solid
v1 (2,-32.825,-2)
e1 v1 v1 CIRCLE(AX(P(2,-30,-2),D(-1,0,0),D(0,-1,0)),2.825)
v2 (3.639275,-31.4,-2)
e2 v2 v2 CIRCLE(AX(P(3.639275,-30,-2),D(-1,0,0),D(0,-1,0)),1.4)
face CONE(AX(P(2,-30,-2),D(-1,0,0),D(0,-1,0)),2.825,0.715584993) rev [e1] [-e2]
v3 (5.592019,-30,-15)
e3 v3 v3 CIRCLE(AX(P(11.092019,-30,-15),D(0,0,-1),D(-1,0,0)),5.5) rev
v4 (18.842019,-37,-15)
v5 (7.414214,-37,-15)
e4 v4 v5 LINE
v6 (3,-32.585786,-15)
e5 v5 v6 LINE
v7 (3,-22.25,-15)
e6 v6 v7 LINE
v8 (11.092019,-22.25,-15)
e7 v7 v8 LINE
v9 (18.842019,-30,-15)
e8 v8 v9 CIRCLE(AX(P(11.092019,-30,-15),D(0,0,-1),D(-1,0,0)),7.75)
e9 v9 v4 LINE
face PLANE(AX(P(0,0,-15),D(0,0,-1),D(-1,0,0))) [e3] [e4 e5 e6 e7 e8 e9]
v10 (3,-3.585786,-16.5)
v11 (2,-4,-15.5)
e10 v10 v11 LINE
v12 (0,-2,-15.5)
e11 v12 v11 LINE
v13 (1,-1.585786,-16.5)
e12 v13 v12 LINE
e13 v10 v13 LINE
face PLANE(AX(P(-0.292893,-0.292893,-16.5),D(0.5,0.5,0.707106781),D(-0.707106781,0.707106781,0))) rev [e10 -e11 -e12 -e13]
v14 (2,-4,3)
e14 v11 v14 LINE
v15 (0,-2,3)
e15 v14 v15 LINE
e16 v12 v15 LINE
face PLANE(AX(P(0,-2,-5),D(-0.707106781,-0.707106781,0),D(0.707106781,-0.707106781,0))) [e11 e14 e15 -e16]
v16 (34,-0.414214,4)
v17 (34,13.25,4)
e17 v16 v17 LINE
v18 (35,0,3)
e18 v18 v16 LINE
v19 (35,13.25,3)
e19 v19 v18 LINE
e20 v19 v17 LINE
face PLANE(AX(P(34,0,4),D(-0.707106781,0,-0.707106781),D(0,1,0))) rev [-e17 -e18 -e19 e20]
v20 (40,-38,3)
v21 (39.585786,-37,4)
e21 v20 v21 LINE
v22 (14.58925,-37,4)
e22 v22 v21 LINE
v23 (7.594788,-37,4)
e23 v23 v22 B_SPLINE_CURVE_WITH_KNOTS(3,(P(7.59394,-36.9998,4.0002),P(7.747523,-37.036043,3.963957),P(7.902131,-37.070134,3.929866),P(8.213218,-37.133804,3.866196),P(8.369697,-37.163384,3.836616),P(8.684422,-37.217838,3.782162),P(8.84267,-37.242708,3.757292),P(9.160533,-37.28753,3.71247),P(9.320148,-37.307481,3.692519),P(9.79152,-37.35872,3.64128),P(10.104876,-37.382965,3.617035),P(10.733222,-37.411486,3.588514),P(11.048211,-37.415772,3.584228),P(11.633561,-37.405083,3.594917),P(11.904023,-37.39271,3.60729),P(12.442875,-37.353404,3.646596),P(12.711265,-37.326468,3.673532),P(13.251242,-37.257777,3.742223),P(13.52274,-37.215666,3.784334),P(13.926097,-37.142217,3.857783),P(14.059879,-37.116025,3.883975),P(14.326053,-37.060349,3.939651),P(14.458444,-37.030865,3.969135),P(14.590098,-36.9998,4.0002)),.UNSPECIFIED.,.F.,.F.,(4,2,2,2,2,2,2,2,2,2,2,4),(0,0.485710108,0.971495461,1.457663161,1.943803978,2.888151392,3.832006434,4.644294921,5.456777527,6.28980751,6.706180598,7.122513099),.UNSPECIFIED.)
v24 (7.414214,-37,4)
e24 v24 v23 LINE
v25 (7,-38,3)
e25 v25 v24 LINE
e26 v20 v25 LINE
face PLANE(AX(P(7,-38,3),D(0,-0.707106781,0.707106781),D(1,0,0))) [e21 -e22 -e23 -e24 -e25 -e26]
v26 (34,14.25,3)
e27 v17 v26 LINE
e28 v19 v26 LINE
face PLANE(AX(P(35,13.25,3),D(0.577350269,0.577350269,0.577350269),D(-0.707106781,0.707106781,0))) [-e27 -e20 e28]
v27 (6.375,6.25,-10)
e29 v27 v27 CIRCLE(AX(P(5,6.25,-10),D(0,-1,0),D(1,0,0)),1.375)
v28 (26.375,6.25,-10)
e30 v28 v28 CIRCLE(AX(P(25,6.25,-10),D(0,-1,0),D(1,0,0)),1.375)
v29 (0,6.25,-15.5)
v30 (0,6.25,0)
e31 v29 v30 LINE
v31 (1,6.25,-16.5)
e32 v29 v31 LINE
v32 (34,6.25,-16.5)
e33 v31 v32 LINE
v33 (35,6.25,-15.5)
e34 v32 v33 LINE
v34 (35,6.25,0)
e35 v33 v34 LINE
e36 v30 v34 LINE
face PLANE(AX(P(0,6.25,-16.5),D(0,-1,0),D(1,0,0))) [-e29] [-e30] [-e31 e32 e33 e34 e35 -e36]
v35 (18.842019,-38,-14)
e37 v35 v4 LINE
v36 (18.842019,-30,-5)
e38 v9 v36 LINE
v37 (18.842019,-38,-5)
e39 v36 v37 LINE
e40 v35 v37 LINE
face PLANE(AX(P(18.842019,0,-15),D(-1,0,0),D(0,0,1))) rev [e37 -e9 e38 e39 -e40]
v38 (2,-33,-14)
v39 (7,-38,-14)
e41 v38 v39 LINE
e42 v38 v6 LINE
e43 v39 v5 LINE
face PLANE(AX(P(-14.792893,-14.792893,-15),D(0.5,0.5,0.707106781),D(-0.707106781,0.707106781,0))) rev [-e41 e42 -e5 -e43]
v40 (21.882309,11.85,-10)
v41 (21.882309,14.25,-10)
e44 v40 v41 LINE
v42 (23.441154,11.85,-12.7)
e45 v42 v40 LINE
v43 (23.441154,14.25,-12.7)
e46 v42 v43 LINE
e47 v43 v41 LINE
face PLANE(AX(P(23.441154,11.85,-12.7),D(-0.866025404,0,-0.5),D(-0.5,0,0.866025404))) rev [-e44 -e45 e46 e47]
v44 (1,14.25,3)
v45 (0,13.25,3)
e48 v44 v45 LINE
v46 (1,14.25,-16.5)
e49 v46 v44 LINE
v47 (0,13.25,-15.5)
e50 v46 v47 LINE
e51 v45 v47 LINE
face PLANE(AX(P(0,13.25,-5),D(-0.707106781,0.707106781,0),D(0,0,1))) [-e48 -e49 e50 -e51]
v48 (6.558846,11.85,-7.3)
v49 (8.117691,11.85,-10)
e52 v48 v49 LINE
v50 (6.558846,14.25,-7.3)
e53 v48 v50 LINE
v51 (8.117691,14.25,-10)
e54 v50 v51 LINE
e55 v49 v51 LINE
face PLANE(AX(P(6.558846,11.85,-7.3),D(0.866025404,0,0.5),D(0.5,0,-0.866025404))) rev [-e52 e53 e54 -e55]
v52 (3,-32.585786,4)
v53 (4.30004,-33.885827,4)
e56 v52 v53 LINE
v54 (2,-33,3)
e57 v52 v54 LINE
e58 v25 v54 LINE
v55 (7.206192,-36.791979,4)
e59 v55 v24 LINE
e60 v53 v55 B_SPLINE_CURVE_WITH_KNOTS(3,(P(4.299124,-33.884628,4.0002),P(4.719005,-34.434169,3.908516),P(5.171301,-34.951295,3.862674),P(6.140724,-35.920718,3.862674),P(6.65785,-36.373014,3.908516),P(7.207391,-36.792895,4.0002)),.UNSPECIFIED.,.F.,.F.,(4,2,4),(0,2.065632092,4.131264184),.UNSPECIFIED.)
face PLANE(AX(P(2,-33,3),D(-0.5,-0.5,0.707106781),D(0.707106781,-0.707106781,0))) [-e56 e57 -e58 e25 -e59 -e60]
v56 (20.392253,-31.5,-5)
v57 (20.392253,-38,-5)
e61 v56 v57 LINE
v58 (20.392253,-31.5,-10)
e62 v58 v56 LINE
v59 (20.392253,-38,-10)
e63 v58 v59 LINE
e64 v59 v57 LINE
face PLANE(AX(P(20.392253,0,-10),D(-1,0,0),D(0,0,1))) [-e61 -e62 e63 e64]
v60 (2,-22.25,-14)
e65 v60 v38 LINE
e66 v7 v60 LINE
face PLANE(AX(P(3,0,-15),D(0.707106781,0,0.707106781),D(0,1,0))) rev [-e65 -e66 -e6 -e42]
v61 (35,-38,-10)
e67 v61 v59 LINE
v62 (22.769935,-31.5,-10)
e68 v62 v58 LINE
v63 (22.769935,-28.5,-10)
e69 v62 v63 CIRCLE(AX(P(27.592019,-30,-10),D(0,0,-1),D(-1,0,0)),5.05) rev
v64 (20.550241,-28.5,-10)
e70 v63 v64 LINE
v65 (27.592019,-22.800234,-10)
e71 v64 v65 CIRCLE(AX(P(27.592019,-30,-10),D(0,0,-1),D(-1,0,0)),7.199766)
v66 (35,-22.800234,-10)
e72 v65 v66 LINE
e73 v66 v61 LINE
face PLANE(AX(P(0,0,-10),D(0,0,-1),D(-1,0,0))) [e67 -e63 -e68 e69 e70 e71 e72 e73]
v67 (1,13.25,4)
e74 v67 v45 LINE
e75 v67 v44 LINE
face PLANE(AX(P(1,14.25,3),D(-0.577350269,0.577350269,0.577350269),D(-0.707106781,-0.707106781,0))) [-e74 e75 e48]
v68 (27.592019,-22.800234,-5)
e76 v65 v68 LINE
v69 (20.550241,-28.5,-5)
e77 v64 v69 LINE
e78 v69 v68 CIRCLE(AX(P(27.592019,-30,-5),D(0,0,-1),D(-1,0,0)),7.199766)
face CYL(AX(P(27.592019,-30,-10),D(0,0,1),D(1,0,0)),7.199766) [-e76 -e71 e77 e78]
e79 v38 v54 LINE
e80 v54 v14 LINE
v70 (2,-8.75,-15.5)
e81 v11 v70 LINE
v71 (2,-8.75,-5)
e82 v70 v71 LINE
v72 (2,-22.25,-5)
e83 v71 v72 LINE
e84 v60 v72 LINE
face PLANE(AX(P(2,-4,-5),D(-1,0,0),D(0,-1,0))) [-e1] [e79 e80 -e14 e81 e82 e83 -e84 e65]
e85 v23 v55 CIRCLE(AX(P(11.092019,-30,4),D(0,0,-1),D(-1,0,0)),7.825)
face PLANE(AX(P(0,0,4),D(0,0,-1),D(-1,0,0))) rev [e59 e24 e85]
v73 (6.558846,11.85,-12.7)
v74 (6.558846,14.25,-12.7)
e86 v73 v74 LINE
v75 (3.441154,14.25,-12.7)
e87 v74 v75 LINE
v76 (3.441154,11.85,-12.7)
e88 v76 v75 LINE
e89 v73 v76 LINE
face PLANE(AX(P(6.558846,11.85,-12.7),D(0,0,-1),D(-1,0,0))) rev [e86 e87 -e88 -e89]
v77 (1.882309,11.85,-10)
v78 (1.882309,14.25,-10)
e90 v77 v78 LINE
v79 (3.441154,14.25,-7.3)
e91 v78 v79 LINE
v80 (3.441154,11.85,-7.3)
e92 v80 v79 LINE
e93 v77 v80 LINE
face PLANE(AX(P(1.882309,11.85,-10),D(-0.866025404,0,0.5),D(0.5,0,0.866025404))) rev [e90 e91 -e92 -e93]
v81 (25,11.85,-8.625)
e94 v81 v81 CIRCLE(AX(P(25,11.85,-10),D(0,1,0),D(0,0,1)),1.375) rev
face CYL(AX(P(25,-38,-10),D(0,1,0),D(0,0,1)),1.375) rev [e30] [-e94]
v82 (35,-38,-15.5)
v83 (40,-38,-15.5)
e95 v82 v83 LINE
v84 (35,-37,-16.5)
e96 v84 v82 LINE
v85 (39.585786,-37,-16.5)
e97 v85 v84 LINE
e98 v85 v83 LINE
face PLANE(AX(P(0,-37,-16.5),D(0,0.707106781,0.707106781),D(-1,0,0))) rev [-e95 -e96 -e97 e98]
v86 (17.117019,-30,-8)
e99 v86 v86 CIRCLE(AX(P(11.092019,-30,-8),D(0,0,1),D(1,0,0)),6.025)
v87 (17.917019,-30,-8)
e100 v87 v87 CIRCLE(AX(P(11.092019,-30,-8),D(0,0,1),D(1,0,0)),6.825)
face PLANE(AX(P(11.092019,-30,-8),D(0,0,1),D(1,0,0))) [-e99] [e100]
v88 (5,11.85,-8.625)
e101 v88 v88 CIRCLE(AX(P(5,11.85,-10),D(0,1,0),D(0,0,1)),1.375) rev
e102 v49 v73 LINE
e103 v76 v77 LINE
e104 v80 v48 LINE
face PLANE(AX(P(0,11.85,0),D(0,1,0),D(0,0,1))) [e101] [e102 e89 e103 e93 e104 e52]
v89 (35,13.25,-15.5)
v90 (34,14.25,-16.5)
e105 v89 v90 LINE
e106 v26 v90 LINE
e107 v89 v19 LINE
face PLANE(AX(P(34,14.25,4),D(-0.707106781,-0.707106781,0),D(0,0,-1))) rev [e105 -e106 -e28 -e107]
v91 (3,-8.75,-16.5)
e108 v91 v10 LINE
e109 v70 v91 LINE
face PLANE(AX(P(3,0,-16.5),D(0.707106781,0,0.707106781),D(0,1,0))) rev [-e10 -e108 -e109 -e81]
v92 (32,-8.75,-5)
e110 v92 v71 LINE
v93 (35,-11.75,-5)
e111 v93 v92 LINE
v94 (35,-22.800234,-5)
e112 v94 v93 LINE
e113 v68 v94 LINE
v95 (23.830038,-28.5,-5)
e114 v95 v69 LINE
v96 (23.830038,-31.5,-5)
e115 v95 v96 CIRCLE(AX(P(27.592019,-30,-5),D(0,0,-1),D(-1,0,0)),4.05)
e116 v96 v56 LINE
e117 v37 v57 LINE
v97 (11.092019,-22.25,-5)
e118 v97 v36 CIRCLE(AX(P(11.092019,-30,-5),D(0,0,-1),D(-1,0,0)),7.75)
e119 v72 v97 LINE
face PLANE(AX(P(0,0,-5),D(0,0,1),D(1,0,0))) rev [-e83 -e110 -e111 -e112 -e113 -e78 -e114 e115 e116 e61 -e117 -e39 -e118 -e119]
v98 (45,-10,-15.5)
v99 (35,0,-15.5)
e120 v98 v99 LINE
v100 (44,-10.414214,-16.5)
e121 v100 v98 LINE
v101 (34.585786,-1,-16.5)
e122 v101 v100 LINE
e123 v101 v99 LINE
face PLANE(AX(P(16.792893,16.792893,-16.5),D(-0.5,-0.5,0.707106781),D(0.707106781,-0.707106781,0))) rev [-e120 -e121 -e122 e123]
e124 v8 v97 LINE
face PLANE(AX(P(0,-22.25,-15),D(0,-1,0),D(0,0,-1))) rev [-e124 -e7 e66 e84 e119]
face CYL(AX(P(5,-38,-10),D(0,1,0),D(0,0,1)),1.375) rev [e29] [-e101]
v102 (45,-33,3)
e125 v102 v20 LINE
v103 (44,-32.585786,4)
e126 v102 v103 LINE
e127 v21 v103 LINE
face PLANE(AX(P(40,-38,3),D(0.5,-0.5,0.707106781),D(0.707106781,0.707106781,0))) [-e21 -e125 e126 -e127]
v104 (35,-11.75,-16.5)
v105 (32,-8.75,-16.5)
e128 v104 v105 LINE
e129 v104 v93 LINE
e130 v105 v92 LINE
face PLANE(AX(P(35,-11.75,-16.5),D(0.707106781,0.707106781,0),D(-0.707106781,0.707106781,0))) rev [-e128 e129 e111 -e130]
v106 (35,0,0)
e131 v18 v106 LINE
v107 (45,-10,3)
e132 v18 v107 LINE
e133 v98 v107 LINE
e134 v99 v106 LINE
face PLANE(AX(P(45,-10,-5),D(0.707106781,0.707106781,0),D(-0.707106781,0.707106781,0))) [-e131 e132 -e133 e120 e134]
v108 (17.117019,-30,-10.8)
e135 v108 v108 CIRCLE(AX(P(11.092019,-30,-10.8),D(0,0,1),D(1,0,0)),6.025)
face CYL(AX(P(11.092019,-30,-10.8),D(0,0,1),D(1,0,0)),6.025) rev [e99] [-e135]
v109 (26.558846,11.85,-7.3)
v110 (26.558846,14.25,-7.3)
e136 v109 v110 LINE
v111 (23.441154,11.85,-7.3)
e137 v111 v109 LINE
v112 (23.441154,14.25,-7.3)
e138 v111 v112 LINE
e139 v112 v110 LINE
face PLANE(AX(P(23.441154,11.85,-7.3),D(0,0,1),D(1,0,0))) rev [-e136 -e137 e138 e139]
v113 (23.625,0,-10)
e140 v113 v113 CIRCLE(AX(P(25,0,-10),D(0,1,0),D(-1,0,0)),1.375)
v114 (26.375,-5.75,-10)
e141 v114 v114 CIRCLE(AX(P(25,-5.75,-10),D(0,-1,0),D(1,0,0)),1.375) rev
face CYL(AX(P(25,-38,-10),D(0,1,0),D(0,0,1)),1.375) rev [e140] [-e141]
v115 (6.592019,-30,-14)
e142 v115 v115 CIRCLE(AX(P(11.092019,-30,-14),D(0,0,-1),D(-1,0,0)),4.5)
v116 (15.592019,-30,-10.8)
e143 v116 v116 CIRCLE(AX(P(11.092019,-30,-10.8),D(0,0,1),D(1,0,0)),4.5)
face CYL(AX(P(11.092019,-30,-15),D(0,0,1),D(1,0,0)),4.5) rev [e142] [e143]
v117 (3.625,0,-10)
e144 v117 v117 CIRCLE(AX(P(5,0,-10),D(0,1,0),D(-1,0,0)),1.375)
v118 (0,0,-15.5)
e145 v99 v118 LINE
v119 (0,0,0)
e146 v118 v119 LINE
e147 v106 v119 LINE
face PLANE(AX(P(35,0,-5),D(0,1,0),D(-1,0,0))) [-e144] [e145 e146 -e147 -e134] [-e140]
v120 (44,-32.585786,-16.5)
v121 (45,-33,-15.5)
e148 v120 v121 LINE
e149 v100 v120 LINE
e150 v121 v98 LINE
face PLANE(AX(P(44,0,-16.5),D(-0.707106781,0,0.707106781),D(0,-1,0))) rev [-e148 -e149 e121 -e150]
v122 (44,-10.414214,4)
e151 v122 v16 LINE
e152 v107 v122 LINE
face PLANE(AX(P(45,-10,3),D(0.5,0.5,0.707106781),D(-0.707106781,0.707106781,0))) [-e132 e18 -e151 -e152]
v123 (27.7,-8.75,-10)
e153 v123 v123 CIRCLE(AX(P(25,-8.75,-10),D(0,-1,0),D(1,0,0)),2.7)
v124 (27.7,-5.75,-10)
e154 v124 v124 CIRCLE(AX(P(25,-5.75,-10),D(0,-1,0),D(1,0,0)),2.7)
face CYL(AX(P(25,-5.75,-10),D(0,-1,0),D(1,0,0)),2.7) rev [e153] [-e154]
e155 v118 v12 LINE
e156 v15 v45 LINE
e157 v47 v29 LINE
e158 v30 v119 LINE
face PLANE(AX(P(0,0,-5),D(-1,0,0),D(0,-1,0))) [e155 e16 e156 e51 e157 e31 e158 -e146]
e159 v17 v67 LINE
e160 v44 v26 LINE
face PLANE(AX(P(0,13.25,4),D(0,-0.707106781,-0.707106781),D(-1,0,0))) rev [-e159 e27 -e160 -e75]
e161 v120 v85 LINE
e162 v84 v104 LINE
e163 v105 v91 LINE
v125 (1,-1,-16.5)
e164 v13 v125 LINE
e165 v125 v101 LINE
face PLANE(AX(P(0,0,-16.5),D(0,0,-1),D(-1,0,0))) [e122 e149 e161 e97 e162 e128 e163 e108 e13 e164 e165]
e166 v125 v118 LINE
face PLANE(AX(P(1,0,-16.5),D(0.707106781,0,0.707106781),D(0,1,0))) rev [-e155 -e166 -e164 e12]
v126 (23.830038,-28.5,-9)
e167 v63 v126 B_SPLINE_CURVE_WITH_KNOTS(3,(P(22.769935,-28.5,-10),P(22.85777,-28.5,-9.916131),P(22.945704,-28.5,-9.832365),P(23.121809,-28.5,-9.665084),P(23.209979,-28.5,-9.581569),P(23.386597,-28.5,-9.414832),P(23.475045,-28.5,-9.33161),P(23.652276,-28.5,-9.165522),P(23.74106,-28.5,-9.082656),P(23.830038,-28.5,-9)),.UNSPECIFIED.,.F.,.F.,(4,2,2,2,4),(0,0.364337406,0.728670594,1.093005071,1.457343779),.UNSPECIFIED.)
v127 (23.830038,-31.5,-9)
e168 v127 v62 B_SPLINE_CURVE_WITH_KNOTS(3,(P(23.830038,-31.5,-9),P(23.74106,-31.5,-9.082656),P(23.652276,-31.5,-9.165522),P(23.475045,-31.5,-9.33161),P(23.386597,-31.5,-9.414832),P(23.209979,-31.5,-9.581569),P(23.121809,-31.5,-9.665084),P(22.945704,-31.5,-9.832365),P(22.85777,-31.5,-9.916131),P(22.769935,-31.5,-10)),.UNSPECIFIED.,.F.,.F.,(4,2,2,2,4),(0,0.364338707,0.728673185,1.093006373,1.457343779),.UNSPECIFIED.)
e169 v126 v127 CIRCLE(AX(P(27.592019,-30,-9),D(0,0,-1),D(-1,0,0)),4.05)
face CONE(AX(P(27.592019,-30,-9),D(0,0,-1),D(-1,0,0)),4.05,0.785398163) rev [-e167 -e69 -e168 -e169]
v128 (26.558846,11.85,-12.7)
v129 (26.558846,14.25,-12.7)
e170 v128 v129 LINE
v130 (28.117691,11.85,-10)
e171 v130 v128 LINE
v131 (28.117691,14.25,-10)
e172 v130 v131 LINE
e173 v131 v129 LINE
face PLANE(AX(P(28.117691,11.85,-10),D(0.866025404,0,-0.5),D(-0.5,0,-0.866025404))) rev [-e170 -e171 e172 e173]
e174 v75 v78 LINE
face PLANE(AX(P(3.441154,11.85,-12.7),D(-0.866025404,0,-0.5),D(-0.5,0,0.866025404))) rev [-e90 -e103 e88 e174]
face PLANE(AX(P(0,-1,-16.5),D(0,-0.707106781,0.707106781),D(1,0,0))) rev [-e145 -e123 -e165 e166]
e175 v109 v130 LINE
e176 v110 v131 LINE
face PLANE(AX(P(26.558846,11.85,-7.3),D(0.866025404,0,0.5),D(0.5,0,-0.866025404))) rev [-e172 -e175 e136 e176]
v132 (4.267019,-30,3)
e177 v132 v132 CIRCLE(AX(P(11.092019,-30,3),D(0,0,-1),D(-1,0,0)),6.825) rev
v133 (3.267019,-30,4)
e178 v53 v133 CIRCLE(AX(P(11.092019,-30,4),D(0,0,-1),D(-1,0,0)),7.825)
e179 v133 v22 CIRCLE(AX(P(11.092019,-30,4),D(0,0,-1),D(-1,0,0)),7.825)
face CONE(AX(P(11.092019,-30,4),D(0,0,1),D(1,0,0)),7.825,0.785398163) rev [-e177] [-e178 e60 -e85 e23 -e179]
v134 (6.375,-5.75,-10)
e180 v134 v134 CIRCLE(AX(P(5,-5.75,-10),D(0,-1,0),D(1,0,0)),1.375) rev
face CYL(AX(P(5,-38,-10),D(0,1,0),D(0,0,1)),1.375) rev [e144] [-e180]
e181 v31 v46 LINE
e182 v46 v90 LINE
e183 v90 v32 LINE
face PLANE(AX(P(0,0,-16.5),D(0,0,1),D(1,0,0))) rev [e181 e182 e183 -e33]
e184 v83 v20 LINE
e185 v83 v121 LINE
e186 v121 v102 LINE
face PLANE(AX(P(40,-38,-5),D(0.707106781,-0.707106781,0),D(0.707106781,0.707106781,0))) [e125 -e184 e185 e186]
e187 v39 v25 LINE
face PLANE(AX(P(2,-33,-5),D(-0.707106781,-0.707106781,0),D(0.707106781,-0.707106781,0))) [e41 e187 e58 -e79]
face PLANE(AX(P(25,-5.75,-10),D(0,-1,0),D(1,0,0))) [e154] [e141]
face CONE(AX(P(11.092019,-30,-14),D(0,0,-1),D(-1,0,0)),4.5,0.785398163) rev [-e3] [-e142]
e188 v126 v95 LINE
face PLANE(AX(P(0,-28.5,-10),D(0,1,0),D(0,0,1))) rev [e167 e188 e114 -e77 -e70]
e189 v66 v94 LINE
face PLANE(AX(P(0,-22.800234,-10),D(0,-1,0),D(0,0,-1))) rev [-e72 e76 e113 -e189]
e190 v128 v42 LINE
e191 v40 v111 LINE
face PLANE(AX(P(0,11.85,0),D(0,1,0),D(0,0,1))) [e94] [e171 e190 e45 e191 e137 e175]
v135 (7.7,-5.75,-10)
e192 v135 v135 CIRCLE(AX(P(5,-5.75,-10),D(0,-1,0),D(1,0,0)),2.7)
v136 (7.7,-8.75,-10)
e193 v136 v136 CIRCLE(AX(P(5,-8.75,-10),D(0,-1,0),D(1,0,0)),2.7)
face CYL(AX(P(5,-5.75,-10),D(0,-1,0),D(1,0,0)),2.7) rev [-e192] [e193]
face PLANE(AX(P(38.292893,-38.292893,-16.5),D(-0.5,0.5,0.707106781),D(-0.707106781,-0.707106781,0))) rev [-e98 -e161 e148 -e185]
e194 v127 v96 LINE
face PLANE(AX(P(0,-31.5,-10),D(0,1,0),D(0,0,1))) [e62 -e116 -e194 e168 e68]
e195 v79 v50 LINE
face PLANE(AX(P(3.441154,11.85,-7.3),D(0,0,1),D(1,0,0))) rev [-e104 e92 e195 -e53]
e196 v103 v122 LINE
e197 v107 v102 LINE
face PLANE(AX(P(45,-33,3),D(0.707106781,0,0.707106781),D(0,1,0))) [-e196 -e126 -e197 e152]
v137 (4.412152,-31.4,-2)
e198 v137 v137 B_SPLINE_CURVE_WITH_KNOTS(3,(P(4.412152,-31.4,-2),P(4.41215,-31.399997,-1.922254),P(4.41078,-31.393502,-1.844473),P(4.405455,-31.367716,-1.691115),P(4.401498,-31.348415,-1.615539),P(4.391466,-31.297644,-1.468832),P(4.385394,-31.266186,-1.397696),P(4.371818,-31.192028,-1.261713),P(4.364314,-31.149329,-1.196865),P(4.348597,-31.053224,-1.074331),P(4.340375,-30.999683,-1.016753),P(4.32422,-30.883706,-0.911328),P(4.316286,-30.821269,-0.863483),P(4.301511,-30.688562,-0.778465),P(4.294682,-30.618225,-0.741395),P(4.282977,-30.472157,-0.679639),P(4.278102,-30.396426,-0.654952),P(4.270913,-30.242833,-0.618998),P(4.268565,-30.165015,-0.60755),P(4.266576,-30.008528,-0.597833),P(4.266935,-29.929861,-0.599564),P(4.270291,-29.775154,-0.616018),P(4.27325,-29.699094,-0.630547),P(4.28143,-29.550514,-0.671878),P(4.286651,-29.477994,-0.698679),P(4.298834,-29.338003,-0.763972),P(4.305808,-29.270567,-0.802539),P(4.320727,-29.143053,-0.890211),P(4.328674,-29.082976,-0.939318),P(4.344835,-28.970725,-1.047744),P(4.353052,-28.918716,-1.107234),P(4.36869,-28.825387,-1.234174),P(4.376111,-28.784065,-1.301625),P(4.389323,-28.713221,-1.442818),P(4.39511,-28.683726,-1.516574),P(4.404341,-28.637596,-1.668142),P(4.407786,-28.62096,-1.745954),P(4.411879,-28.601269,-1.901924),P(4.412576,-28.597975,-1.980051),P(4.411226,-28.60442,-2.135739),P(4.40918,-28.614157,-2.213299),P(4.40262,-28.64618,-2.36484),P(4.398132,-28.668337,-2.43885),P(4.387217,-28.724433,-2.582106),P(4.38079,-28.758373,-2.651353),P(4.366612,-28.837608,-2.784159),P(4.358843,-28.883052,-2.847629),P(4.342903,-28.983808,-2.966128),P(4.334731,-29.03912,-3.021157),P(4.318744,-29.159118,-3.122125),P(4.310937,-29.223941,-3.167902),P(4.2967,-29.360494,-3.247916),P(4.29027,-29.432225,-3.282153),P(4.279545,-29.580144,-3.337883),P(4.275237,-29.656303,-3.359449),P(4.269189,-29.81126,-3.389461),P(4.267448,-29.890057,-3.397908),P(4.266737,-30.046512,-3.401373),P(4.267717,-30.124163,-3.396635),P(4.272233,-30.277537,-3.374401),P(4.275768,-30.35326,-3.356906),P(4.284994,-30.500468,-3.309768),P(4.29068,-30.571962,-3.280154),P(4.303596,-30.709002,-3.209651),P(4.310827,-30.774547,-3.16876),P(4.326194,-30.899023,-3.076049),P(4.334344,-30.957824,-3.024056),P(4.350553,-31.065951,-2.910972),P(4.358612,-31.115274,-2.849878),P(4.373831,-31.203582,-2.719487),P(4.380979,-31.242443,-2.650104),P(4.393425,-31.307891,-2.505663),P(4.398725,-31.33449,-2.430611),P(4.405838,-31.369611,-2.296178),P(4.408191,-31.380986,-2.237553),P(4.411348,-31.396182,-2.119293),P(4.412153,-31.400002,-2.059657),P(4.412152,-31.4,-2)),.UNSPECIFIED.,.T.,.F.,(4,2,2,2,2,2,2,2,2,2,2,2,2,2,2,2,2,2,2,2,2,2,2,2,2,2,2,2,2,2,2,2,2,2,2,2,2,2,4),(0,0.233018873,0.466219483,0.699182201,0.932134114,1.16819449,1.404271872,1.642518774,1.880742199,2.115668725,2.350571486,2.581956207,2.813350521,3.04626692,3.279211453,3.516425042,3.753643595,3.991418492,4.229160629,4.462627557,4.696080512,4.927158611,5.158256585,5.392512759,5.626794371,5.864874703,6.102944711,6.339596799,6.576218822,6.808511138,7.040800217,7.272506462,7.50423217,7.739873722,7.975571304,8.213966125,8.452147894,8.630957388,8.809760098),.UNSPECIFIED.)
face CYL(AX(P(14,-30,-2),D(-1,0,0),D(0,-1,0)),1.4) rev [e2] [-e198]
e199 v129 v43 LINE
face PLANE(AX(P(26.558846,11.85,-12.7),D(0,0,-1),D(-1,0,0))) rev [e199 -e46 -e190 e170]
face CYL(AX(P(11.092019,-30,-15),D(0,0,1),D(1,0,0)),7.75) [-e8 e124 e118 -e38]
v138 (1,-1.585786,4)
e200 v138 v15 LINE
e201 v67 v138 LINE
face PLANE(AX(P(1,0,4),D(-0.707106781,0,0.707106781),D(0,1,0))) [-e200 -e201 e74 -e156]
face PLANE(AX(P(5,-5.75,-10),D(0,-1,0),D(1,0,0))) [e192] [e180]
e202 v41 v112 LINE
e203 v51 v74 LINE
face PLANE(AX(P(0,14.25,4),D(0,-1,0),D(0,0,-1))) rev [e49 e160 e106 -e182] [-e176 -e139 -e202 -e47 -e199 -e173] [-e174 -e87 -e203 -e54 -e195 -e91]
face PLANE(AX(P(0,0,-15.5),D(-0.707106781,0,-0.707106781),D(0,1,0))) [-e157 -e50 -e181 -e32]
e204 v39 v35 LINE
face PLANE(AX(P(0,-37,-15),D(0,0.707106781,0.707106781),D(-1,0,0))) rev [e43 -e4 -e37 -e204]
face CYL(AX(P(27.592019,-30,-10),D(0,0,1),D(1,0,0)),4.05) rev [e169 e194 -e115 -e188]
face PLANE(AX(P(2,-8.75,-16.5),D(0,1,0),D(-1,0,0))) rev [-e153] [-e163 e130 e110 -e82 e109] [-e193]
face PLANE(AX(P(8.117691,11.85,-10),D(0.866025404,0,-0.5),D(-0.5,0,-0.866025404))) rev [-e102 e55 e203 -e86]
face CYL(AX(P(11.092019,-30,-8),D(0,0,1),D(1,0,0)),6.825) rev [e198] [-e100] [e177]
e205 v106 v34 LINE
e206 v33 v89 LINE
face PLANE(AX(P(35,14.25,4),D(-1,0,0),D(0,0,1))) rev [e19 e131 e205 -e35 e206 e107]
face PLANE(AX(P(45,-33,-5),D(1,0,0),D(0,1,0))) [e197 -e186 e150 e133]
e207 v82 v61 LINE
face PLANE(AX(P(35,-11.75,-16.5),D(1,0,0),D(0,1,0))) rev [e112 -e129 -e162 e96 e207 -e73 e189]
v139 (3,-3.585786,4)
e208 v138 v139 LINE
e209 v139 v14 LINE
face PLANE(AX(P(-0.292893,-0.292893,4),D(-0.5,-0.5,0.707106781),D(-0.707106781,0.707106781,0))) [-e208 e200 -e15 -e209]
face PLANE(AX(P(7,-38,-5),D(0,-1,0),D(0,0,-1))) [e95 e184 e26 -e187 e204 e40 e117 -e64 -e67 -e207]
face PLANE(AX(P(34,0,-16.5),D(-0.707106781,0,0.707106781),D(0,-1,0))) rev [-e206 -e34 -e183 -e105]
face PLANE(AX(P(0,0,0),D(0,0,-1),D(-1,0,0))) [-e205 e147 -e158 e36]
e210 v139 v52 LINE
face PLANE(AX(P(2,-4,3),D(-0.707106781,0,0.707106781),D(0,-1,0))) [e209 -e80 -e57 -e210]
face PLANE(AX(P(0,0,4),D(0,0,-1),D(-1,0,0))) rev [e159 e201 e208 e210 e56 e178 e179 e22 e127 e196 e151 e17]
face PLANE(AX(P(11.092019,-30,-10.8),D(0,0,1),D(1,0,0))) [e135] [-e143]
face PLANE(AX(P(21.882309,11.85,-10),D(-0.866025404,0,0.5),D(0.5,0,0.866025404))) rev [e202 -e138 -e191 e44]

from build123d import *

# Parameters (mm, degrees)
EXTRUDE_1_DEPTH          = 5
EXTRUDE_2_DEPTH          = 4
SKETCH_3_W               = 35
SKETCH_3_H               = 8
EXTRUDE_3_DEPTH          = 16.5
EXTRUDE_4_DEPTH          = 11.5
CUT_EXTRUDE_1_DEPTH      = 62.165758395
CUT_EXTRUDE_1_DEPTH_BACK = 62.165758395
SKETCH_6_R               = 1.375
CUT_EXTRUDE_2_DEPTH      = 2.4
SKETCH_9_R               = 2.7
CUT_EXTRUDE_4_DEPTH      = 3
EXTRUDE_5_DEPTH          = 5
SKETCH_10_3_R            = 4.5
EXTRUDE_6_DEPTH          = 10
SKETCH_13_R              = 6.825
CUT_EXTRUDE_5_DEPTH      = 8
SKETCH_14_R              = 6.025
CUT_EXTRUDE_6_DEPTH      = 2.8
SKETCH_15_R              = 1.4
CUT_EXTRUDE_7_DEPTH      = 12
CHAMFER_2_SIZE           = 1
EXTRUDE_START            = 4
SKETCH_18_R              = 6.825
EXTRUDE_9_DEPTH          = 4
SKETCH_19_R              = 2.825
CUT_EXTRUDE_9_DEPTH      = 1.8
CUT_EXTRUDE_9_DRAFT      = -41


with BuildPart() as part:
    # 스케치1 → 보스-돌출1 (new body)
    with BuildSketch(Plane.XY):
        Polygon((0, 0), (0, -2), (2, -4), (2, -33), (7, -38), (40, -38), (45, -33), (45, -10), (35, 0), align=None)
    extrude(amount=-EXTRUDE_1_DEPTH)

    # 스케치2 → 보스-돌출2 (add)
    with BuildSketch(Plane.XY):
        Polygon((0, -2), (0, 14.25), (35, 14.25), (35, -4), (2, -4), align=None)
    extrude(amount=EXTRUDE_2_DEPTH)

    # 스케치3 → 보스-돌출3 (add)
    with BuildSketch(Plane(origin=(0, 0, 0), x_dir=(-1, 0, 0), z_dir=(0, 0, -1))):
        with Locations((-17.5, 10.25)):
            Rectangle(SKETCH_3_W, SKETCH_3_H)
    extrude(amount=EXTRUDE_3_DEPTH)

    # 스케치5 → 보스-돌출4 (add)
    with BuildSketch(Plane(origin=(0, 0, -5), x_dir=(-1, 0, 0), z_dir=(0, 0, -1))):
        Polygon((-35, -11.75), (-35, -38), (-40, -38), (-45, -33), (-45, -10), (-35, 0), (0, 0), (0, -2), (-2, -4), (-2, -8.75), (-32, -8.75), align=None)
    extrude(amount=EXTRUDE_4_DEPTH)

    # 스케치6 → 컷-돌출1 (cut, two sides: drawn at the far end of the back side and taken through both)
    with BuildSketch(Plane(origin=(0, 0, 0), x_dir=(1, 0, 0), z_dir=(0, 1, 0)).offset(-CUT_EXTRUDE_1_DEPTH_BACK)):
        with Locations(Location((25, 10, 0), (0, 0, 180))):
            Circle(SKETCH_6_R)
        with Locations(Location((5, 10, 0), (0, 0, 180))):
            Circle(SKETCH_6_R)
    extrude(amount=CUT_EXTRUDE_1_DEPTH + CUT_EXTRUDE_1_DEPTH_BACK, mode=Mode.SUBTRACT)

    # 스케치7 → 컷-돌출2 (cut)
    with BuildSketch(Plane(origin=(0, 14.25, 0), x_dir=(1, 0, 0), z_dir=(0, 1, 0))):
        Polygon((8.117691454, 10), (6.558845727, 12.7), (3.441154273, 12.7), (1.882308546, 10), (3.441154273, 7.3), (6.558845727, 7.3), align=None)
        Polygon((28.117691454, 10), (26.558845727, 12.7), (23.441154273, 12.7), (21.882308546, 10), (23.441154273, 7.3), (26.558845727, 7.3), align=None)
    extrude(amount=-CUT_EXTRUDE_2_DEPTH, mode=Mode.SUBTRACT)

    # 스케치9 → 컷-돌출4 (cut)
    with BuildSketch(Plane.XZ.offset(8.75)):
        with Locations((5, -10)):
            Circle(SKETCH_9_R)
        with Locations((25, -10)):
            Circle(SKETCH_9_R)
    extrude(amount=-CUT_EXTRUDE_4_DEPTH, mode=Mode.SUBTRACT)

    # 스케치10 → 보스-돌출5 (add)
    with BuildSketch(Plane(origin=(0, 0, -5), x_dir=(-1, 0, 0), z_dir=(0, 0, -1))):
        with BuildLine():
            ThreePointArc((-20.550241291, -28.5), (-23.062284829, -24.403738546), (-27.592019124, -22.800233681))
            Line((-27.592019124, -22.800233681), (-35, -22.800233681))
            Line((-35, -22.800233681), (-35, -38))
            Line((-35, -38), (-20.392252805, -38))
            Line((-20.392252805, -38), (-20.392252805, -31.5))
            Line((-20.392252805, -31.5), (-23.830038263, -31.5))
            ThreePointArc((-23.830038263, -31.5), (-31.642019124, -30), (-23.830038263, -28.5))
            Line((-23.830038263, -28.5), (-20.550241291, -28.5))
        make_face()
    extrude(amount=EXTRUDE_5_DEPTH)

    # 스케치10<3> → 보스-돌출6 (add)
    with BuildSketch(Plane(origin=(0, 0, -5), x_dir=(-1, 0, 0), z_dir=(0, 0, -1))):
        with BuildLine():
            ThreePointArc((-11.092019124, -22.25), (-16.572096678, -24.519922446), (-18.842019124, -30))
            Line((-18.842019124, -30), (-18.842019124, -38))
            Line((-18.842019124, -38), (-7, -38))
            Line((-7, -38), (-2, -33))
            Line((-2, -33), (-2, -22.25))
            Line((-2, -22.25), (-11.092019124, -22.25))
        make_face()
        with Locations((-11.092019124, -30)):
            Circle(SKETCH_10_3_R, mode=Mode.SUBTRACT)
    extrude(amount=EXTRUDE_6_DEPTH)

    # 스케치13 → 컷-돌출5 (cut)
    with BuildSketch(Plane.XY):
        with Locations((11.092019124, -30)):
            Circle(SKETCH_13_R)
    extrude(amount=-CUT_EXTRUDE_5_DEPTH, mode=Mode.SUBTRACT)

    # 스케치14 → 컷-돌출6 (cut)
    with BuildSketch(Plane.XY.offset(-8)):
        with Locations((11.092019124, -30)):
            Circle(SKETCH_14_R)
    extrude(amount=-CUT_EXTRUDE_6_DEPTH, mode=Mode.SUBTRACT)

    # 스케치15 → 컷-돌출7 (cut)
    with BuildSketch(Plane.ZY.offset(-2)):
        with Locations(Location((-2, -30, 0), (0, 0, 270))):
            Circle(SKETCH_15_R)
    extrude(amount=-CUT_EXTRUDE_7_DEPTH, mode=Mode.SUBTRACT)

    # 모따기2
    chamfer_2_edges = [part.edges().sort_by_distance(p)[0] for p in [
        (31.642019124, -30, -10),
        (15.592019124, -30, -15),
    ]]
    chamfer(chamfer_2_edges, length=CHAMFER_2_SIZE)

    # 스케치18 → 보스-돌출9 (add)
    with BuildSketch(Plane.XY.offset(EXTRUDE_START)):
        Polygon((35, 0), (35, -4), (2, -4), (2, -33), (7, -38), (40, -38), (45, -33), (45, -10), align=None)
        with Locations((11.092019124, -30)):
            Circle(SKETCH_18_R, mode=Mode.SUBTRACT)
    extrude(amount=-EXTRUDE_9_DEPTH)


with BuildPart() as cut_extrude_9_tool:
    # 스케치19 → 컷-돌출9 (with draft: the straight prism first)
    with BuildSketch(Plane.ZY.offset(-2)):
        with Locations((-2, -30)):
            Circle(SKETCH_19_R)
    extrude(amount=-CUT_EXTRUDE_9_DEPTH)
    # 컷-돌출9: the draft: its side faces are tilted about the plane it starts from
    cut_extrude_9_sides = [cut_extrude_9_tool.faces().sort_by_distance(p)[0] for p in [
        (2.9, -30, -4.825),
    ]]
    draft(cut_extrude_9_sides, Plane.ZY.offset(-2), CUT_EXTRUDE_9_DRAFT)


with BuildPart() as part_1:
    add(part.part)

    # 컷-돌출9: cut by cut_extrude_9_tool
    add(cut_extrude_9_tool.part, mode=Mode.SUBTRACT)

    # 모따기4
    # the kernel refuses this chamfer: 1 mm, written as the material it takes off along each edge
    with BuildSketch(Plane(origin=(34.333333333, 13.583333333, 3.333333333), x_dir=(-0.7071067811865475, 0.7071067811865475, 0), z_dir=(0.5773502691896258, 0.5773502691896258, 0.5773502691896258))) as chamfer_4_piece_1:
        Polygon((-0.707106781, -0.40824829), (0.707106781, -0.40824829), (0, 0.816496581), align=None)
    extrude(amount=1.270170592, mode=Mode.SUBTRACT)
    with BuildSketch(Plane(origin=(0.666666667, 13.583333333, 3.333333333), x_dir=(0.707106781186548, 0.7071067811865469, 0), z_dir=(-0.5773502691896252, 0.5773502691896261, 0.5773502691896261))) as chamfer_4_piece_2:
        Polygon((-0.707106781, 0.40824829), (0.707106781, 0.40824829), (0, -0.816496581), align=None)
    extrude(amount=1.270170592, mode=Mode.SUBTRACT)
    with BuildSketch(Plane(origin=(21.413702112, -38, -15), x_dir=(0, -0.0274958766105891, 0.9996219169112968), z_dir=(-1, 0, 0))) as chamfer_4_piece_3:
        with BuildLine():
            Line((1.028673195, 0), (-0.056547155, 1.027117794))
            Line((-0.056547155, 1.027117794), (-0.076539593, 1.026567876))
            ThreePointArc((-0.076539593, 1.026567876), (-0.034129227, 0.51339783), (-0.019992438, -0.000549918))
            Line((-0.019992438, -0.000549918), (0.000549918, -0.019992438))
            ThreePointArc((0.000549918, -0.019992438), (0.514497665, -0.00585565), (1.029223113, -0.019992438))
            Line((1.029223113, -0.019992438), (1.028673195, 0))
        make_face()
    extrude(amount=16.9853851, mode=Mode.SUBTRACT)
    with BuildSketch(Plane(origin=(8.81845448, -39.81845448, -15), x_dir=(-0.01944252080601553, -0.019442520806015537, 0.9996219169112968), z_dir=(-0.7071067811865476, 0.7071067811865475, 0)), Plane(origin=(38.18154552, -39.81845448, -16.5), x_dir=(-0.7068394360706736, 0.7068394360706736, -0.027495876610585564), z_dir=(0.7071067811865476, 0.7071067811865476, 0)), Plane(origin=(38.18154552, -39.81845448, 4), x_dir=(0.01944252080601724, -0.01944252080601724, -0.9996219169112965), z_dir=(0.7071067811865476, 0.7071067811865476, 0))) as chamfer_4_piece_4:
        with BuildLine():
            Line((1.028673195, 0), (-0.056547155, 1.027117794))
            Line((-0.056547155, 1.027117794), (-0.076539593, 1.026567876))
            ThreePointArc((-0.076539593, 1.026567876), (-0.034129227, 0.51339783), (-0.019992438, -0.000549918))
            Line((-0.019992438, -0.000549918), (0.000549918, -0.019992438))
            ThreePointArc((0.000549918, -0.019992438), (0.514497665, -0.00585565), (1.029223113, -0.019992438))
            Line((1.029223113, -0.019992438), (1.028673195, 0))
        make_face()
    extrude(amount=12.214433788, mode=Mode.SUBTRACT)
    with BuildSketch(Plane(origin=(2, -35.571682988, -15), x_dir=(0.9996219169112968, 0, -0.027495876610585623), z_dir=(0, 1, 0))) as chamfer_4_piece_5:
        with BuildLine():
            Line((1.028673195, 0), (-0.056547155, -1.027117794))
            Line((-0.056547155, -1.027117794), (-0.076539593, -1.026567876))
            ThreePointArc((-0.076539593, -1.026567876), (-0.034129227, -0.51339783), (-0.019992438, 0.000549918))
            Line((-0.019992438, 0.000549918), (0.000549918, 0.019992438))
            ThreePointArc((0.000549918, 0.019992438), (0.514497665, 0.00585565), (1.029223113, 0.019992438))
            Line((1.029223113, 0.019992438), (1.028673195, 0))
        make_face()
    extrude(amount=15.893365976, mode=Mode.SUBTRACT)
    with BuildSketch(Plane(origin=(32.428317012, -38, -16.5), x_dir=(0, -0.0274958766105891, 0.9996219169112968), z_dir=(1, 0, 0))) as chamfer_4_piece_6:
        with BuildLine():
            Line((1.028673195, 0), (-0.056547155, -1.027117794))
            Line((-0.056547155, -1.027117794), (-0.076539593, -1.026567876))
            ThreePointArc((-0.076539593, -1.026567876), (-0.034129227, -0.51339783), (-0.019992438, 0.000549918))
            Line((-0.019992438, 0.000549918), (0.000549918, 0.019992438))
            ThreePointArc((0.000549918, 0.019992438), (0.514497665, 0.00585565), (1.029223113, 0.019992438))
            Line((1.029223113, 0.019992438), (1.028673195, 0))
        make_face()
    extrude(amount=10.143365976, mode=Mode.SUBTRACT)
    with BuildSketch(Plane(origin=(2, -1.428317012, -16.5), x_dir=(0.9996219169112968, 0, -0.027495876610585623), z_dir=(0, -1, 0))) as chamfer_4_piece_7_section:
        with BuildLine():
            Line((1.028673195, 0), (-0.056547155, 1.027117794))
            Line((-0.056547155, 1.027117794), (-0.076539593, 1.026567876))
            ThreePointArc((-0.076539593, 1.026567876), (-0.034129227, 0.51339783), (-0.019992438, -0.000549918))
            Line((-0.019992438, -0.000549918), (0.000549918, -0.019992438))
            ThreePointArc((0.000549918, -0.019992438), (0.514497665, -0.00585565), (1.029223113, -0.019992438))
            Line((1.029223113, -0.019992438), (1.028673195, 0))
        make_face()
    chamfer_4_piece_7 = extrude(amount=9.893365976, mode=Mode.PRIVATE)
    chamfer_4_piece_7 = split(chamfer_4_piece_7, bisect_by=Plane(origin=(4.070954231, -6.070954231, -16.165350928), z_dir=(-0.7071067811865476, -0.7071067811865475, 0)), keep=Keep.TOP, mode=Mode.PRIVATE)
    add(chamfer_4_piece_7, mode=Mode.SUBTRACT)
    with BuildSketch(Plane(origin=(-1.81845448, -0.18154552, -16.5), x_dir=(0.7068394360706737, 0.7068394360706735, -0.027495876610585647), z_dir=(0.7071067811865475, -0.7071067811865476, 0))) as chamfer_4_piece_8_section:
        with BuildLine():
            Line((1.028673195, 0), (-0.056547155, 1.027117794))
            Line((-0.056547155, 1.027117794), (-0.076539593, 1.026567876))
            ThreePointArc((-0.076539593, 1.026567876), (-0.034129227, 0.51339783), (-0.019992438, -0.000549918))
            Line((-0.019992438, -0.000549918), (0.000549918, -0.019992438))
            ThreePointArc((0.000549918, -0.019992438), (0.514497665, -0.00585565), (1.029223113, -0.019992438))
            Line((1.029223113, -0.019992438), (1.028673195, 0))
        make_face()
    chamfer_4_piece_8 = extrude(amount=7.971793101, mode=Mode.PRIVATE)
    chamfer_4_piece_8 = split(chamfer_4_piece_8, bisect_by=Plane(origin=(2, -1.754257901, -16.163510789), z_dir=(-1, 0, 0)), keep=Keep.TOP, mode=Mode.PRIVATE)
    add(chamfer_4_piece_8, mode=Mode.SUBTRACT)
    with BuildSketch(Plane(origin=(0, 2.571682988, -16.5), x_dir=(0.9996219169112968, 0, -0.02749587661058563), z_dir=(0, -1, 0))) as chamfer_4_piece_9:
        with BuildLine():
            Line((1.028673195, 0), (-0.056547155, 1.027117794))
            Line((-0.056547155, 1.027117794), (-0.076539593, 1.026567876))
            ThreePointArc((-0.076539593, 1.026567876), (-0.034129227, 0.51339783), (-0.019992438, -0.000549918))
            Line((-0.019992438, -0.000549918), (0.000549918, -0.019992438))
            ThreePointArc((0.000549918, -0.019992438), (0.514497665, -0.00585565), (1.029223113, -0.019992438))
            Line((1.029223113, -0.019992438), (1.028673195, 0))
        make_face()
    extrude(amount=7.143365976, mode=Mode.SUBTRACT)
    with BuildSketch(Plane(origin=(37.571682988, 0, -16.5), x_dir=(0, -0.9996219169112968, -0.02749587661058563), z_dir=(-1, 0, 0)), Plane(origin=(-2.571682988, 14.25, 4), x_dir=(0, -0.9996219169112968, 0.02749587661058651), z_dir=(1, 0, 0))) as chamfer_4_piece_10:
        with BuildLine():
            Line((1.028673195, 0), (-0.056547155, 1.027117794))
            Line((-0.056547155, 1.027117794), (-0.076539593, 1.026567876))
            ThreePointArc((-0.076539593, 1.026567876), (-0.034129227, 0.51339783), (-0.019992438, -0.000549918))
            Line((-0.019992438, -0.000549918), (0.000549918, -0.019992438))
            ThreePointArc((0.000549918, -0.019992438), (0.514497665, -0.00585565), (1.029223113, -0.019992438))
            Line((1.029223113, -0.019992438), (1.028673195, 0))
        make_face()
    extrude(amount=40.143365976, mode=Mode.SUBTRACT)
    with BuildSketch(Plane(origin=(45, -35.571682988, -16.5), x_dir=(-0.9996219169112968, 0, -0.02749587661058555), z_dir=(0, 1, 0))) as chamfer_4_piece_11:
        with BuildLine():
            Line((1.028673195, 0), (-0.056547155, 1.027117794))
            Line((-0.056547155, 1.027117794), (-0.076539593, 1.026567876))
            ThreePointArc((-0.076539593, 1.026567876), (-0.034129227, 0.51339783), (-0.019992438, -0.000549918))
            Line((-0.019992438, -0.000549918), (0.000549918, -0.019992438))
            ThreePointArc((0.000549918, -0.019992438), (0.514497665, -0.00585565), (1.029223113, -0.019992438))
            Line((1.029223113, -0.019992438), (1.028673195, 0))
        make_face()
    extrude(amount=28.143365976, mode=Mode.SUBTRACT)
    with BuildSketch(Plane(origin=(46.81845448, -11.81845448, -16.5), x_dir=(-0.7068394360706728, -0.7068394360706741, -0.02749587661058559), z_dir=(-0.7071067811865482, 0.7071067811865469, 0))) as chamfer_4_piece_12:
        with BuildLine():
            Line((1.028673195, 0), (-0.056547155, 1.027117794))
            Line((-0.056547155, 1.027117794), (-0.076539593, 1.026567876))
            ThreePointArc((-0.076539593, 1.026567876), (-0.034129227, 0.51339783), (-0.019992438, -0.000549918))
            Line((-0.019992438, -0.000549918), (0.000549918, -0.019992438))
            ThreePointArc((0.000549918, -0.019992438), (0.514497665, -0.00585565), (1.029223113, -0.019992438))
            Line((1.029223113, -0.019992438), (1.028673195, 0))
        make_face()
    extrude(amount=19.2855016, mode=Mode.SUBTRACT)
    with BuildSketch(Plane(origin=(11.092019124, -30, 4), x_dir=(1, 0, 0), z_dir=(0, -1, 0))) as chamfer_4_piece_13:
        with BuildLine():
            Line((7.853284271, 0.028284271), (6.796715729, -1.028284271))
            Line((6.796715729, -1.028284271), (6.776715729, -1.028284271))
            ThreePointArc((6.776715729, -1.028284271), (6.805, -0.514142136), (6.805, 0))
            Line((6.805, 0), (6.825, 0.02))
            ThreePointArc((6.825, 0.02), (7.339142136, 0.02), (7.853284271, 0.048284271))
            Line((7.853284271, 0.048284271), (7.853284271, 0.028284271))
        make_face()
    revolve(axis=Axis((11.092019124, -30, 4), (0, 0, 1)), mode=Mode.SUBTRACT)
    with BuildSketch(Plane(origin=(35, 16.821682988, -16.5), x_dir=(0.0274958766105891, 0, 0.9996219169112968), z_dir=(0, -1, 0)), Plane(origin=(0, 3.678317012, -16.5), x_dir=(-0.0274958766105864, 0, 0.9996219169112968), z_dir=(0, 1, 0))) as chamfer_4_piece_14:
        with BuildLine():
            Line((1.028673195, 0), (-0.056547155, 1.027117794))
            Line((-0.056547155, 1.027117794), (-0.076539593, 1.026567876))
            ThreePointArc((-0.076539593, 1.026567876), (-0.034129227, 0.51339783), (-0.019992438, -0.000549918))
            Line((-0.019992438, -0.000549918), (0.000549918, -0.019992438))
            ThreePointArc((0.000549918, -0.019992438), (0.514497665, -0.00585565), (1.029223113, -0.019992438))
            Line((1.029223113, -0.019992438), (1.028673195, 0))
        make_face()
    extrude(amount=13.143365976, mode=Mode.SUBTRACT)
    with BuildSketch(Plane(origin=(3.81845448, -5.81845448, 4), x_dir=(0.7068394360706737, 0.7068394360706735, 0.027495876610586528), z_dir=(-0.7071067811865475, 0.7071067811865476, 0))) as chamfer_4_piece_15_section:
        with BuildLine():
            Line((1.028673195, 0), (-0.056547155, 1.027117794))
            Line((-0.056547155, 1.027117794), (-0.076539593, 1.026567876))
            ThreePointArc((-0.076539593, 1.026567876), (-0.034129227, 0.51339783), (-0.019992438, -0.000549918))
            Line((-0.019992438, -0.000549918), (0.000549918, -0.019992438))
            ThreePointArc((0.000549918, -0.019992438), (0.514497665, -0.00585565), (1.029223113, -0.019992438))
            Line((1.029223113, -0.019992438), (1.028673195, 0))
        make_face()
    chamfer_4_piece_15 = extrude(amount=7.971793101, mode=Mode.PRIVATE)
    chamfer_4_piece_15 = split(chamfer_4_piece_15, bisect_by=Plane(origin=(2, -1.754257901, 3.663510789), z_dir=(-1, 0, 0)), keep=Keep.TOP, mode=Mode.PRIVATE)
    add(chamfer_4_piece_15, mode=Mode.SUBTRACT)
    with BuildSketch(Plane(origin=(2, -1.428317012, 4), x_dir=(0.9996219169112968, 0, 0.027495876610586487), z_dir=(0, -1, 0))) as chamfer_4_piece_16_section:
        with BuildLine():
            Line((1.028673195, 0), (-0.056547155, -1.027117794))
            Line((-0.056547155, -1.027117794), (-0.076539593, -1.026567876))
            ThreePointArc((-0.076539593, -1.026567876), (-0.034129227, -0.51339783), (-0.019992438, 0.000549918))
            Line((-0.019992438, 0.000549918), (0.000549918, 0.019992438))
            ThreePointArc((0.000549918, 0.019992438), (0.514497665, 0.00585565), (1.029223113, 0.019992438))
            Line((1.029223113, 0.019992438), (1.028673195, 0))
        make_face()
    chamfer_4_piece_16 = extrude(amount=34.143365976, mode=Mode.PRIVATE)
    chamfer_4_piece_16 = split(chamfer_4_piece_16, bisect_by=Plane(origin=(10.13874151, -12.13874151, 3.669119732), z_dir=(-0.7071067811865476, -0.7071067811865475, 0)), keep=Keep.TOP, mode=Mode.PRIVATE)
    add(chamfer_4_piece_16, mode=Mode.SUBTRACT)
    with BuildSketch(Plane(origin=(0.18154552, -31.18154552, 4), x_dir=(0.7068394360706735, 0.7068394360706737, 0.027495876610586552), z_dir=(0.7071067811865476, -0.7071067811865475, 0))) as chamfer_4_piece_17:
        with BuildLine():
            Line((1.028673195, 0), (-0.056547155, -1.027117794))
            Line((-0.056547155, -1.027117794), (-0.076539593, -1.026567876))
            ThreePointArc((-0.076539593, -1.026567876), (-0.034129227, -0.51339783), (-0.019992438, 0.000549918))
            Line((-0.019992438, 0.000549918), (0.000549918, 0.019992438))
            ThreePointArc((0.000549918, 0.019992438), (0.514497665, 0.00585565), (1.029223113, 0.019992438))
            Line((1.029223113, 0.019992438), (1.028673195, 0))
        make_face()
    extrude(amount=12.214433788, mode=Mode.SUBTRACT)
    with BuildSketch(Plane(origin=(4.428317012, -38, 4), x_dir=(0, -0.02749587661058907, -0.9996219169112965), z_dir=(1, 0, 0))) as chamfer_4_piece_18:
        with BuildLine():
            Line((1.028673195, 0), (-0.056547155, 1.027117794))
            Line((-0.056547155, 1.027117794), (-0.076539593, 1.026567876))
            ThreePointArc((-0.076539593, 1.026567876), (-0.034129227, 0.51339783), (-0.019992438, -0.000549918))
            Line((-0.019992438, -0.000549918), (0.000549918, -0.019992438))
            ThreePointArc((0.000549918, -0.019992438), (0.514497665, -0.00585565), (1.029223113, -0.019992438))
            Line((1.029223113, -0.019992438), (1.028673195, 0))
        make_face()
    extrude(amount=38.143365976, mode=Mode.SUBTRACT)
    with BuildSketch(Plane(origin=(45, -35.571682988, 4), x_dir=(-0.9996219169112968, 0, 0.027495876610586414), z_dir=(0, 1, 0))) as chamfer_4_piece_19:
        with BuildLine():
            Line((1.028673195, 0), (-0.056547155, -1.027117794))
            Line((-0.056547155, -1.027117794), (-0.076539593, -1.026567876))
            ThreePointArc((-0.076539593, -1.026567876), (-0.034129227, -0.51339783), (-0.019992438, 0.000549918))
            Line((-0.019992438, 0.000549918), (0.000549918, 0.019992438))
            ThreePointArc((0.000549918, 0.019992438), (0.514497665, 0.00585565), (1.029223113, 0.019992438))
            Line((1.029223113, 0.019992438), (1.028673195, 0))
        make_face()
    extrude(amount=28.143365976, mode=Mode.SUBTRACT)
    with BuildSketch(Plane(origin=(46.81845448, -11.81845448, 4), x_dir=(-0.7068394360706728, -0.7068394360706741, 0.027495876610586455), z_dir=(-0.7071067811865482, 0.7071067811865469, 0))) as chamfer_4_piece_20_section:
        with BuildLine():
            Line((1.028673195, 0), (-0.056547155, -1.027117794))
            Line((-0.056547155, -1.027117794), (-0.076539593, -1.026567876))
            ThreePointArc((-0.076539593, -1.026567876), (-0.034129227, -0.51339783), (-0.019992438, 0.000549918))
            Line((-0.019992438, 0.000549918), (0.000549918, 0.019992438))
            ThreePointArc((0.000549918, 0.019992438), (0.514497665, 0.00585565), (1.029223113, 0.019992438))
            Line((1.029223113, 0.019992438), (1.028673195, 0))
        make_face()
    chamfer_4_piece_20 = extrude(amount=19.2855016, mode=Mode.PRIVATE)
    chamfer_4_piece_20 = split(chamfer_4_piece_20, bisect_by=Plane(origin=(35, -6.254915211, 3.66813431), z_dir=(1, 0, 0)), keep=Keep.TOP, mode=Mode.PRIVATE)
    add(chamfer_4_piece_20, mode=Mode.SUBTRACT)
    with BuildSketch(Plane(origin=(35, 14.25, 6.571682988), x_dir=(0.0274958766105891, -0.9996219169112968, 0), z_dir=(0, 0, -1))) as chamfer_4_piece_21:
        with BuildLine():
            Line((1.028673195, 0), (-0.056547155, 1.027117794))
            Line((-0.056547155, 1.027117794), (-0.076539593, 1.026567876))
            ThreePointArc((-0.076539593, 1.026567876), (-0.034129227, 0.51339783), (-0.019992438, -0.000549918))
            Line((-0.019992438, -0.000549918), (0.000549918, -0.019992438))
            ThreePointArc((0.000549918, -0.019992438), (0.514497665, -0.00585565), (1.029223113, -0.019992438))
            Line((1.029223113, -0.019992438), (1.028673195, 0))
        make_face()
    extrude(amount=25.643365976, mode=Mode.SUBTRACT)
    with BuildSketch(Plane(origin=(35, 16.821682988, 4), x_dir=(-0.9996219169112968, 0, 0.027495876610586414), z_dir=(0, -1, 0))) as chamfer_4_piece_22_section:
        with BuildLine():
            Line((1.028673195, 0), (-0.056547155, 1.027117794))
            Line((-0.056547155, 1.027117794), (-0.076539593, 1.026567876))
            ThreePointArc((-0.076539593, 1.026567876), (-0.034129227, 0.51339783), (-0.019992438, -0.000549918))
            Line((-0.019992438, -0.000549918), (0.000549918, -0.019992438))
            ThreePointArc((0.000549918, -0.019992438), (0.514497665, -0.00585565), (1.029223113, -0.019992438))
            Line((1.029223113, -0.019992438), (1.028673195, 0))
        make_face()
    chamfer_4_piece_22 = extrude(amount=19.393365976, mode=Mode.PRIVATE)
    chamfer_4_piece_22 = split(chamfer_4_piece_22, bisect_by=Plane(origin=(30.550121932, 4.449878068, 3.668147862), z_dir=(0.7071067811865469, 0.7071067811865482, 0)), keep=Keep.TOP, mode=Mode.PRIVATE)
    add(chamfer_4_piece_22, mode=Mode.SUBTRACT)
    with BuildSketch(Plane(origin=(0, 14.25, 6.571682988), x_dir=(-0.02749587661058627, -0.9996219169112968, 0), z_dir=(0, 0, -1))) as chamfer_4_piece_23:
        with BuildLine():
            Line((1.028673195, 0), (-0.056547155, -1.027117794))
            Line((-0.056547155, -1.027117794), (-0.076539593, -1.026567876))
            ThreePointArc((-0.076539593, -1.026567876), (-0.034129227, -0.51339783), (-0.019992438, 0.000549918))
            Line((-0.019992438, 0.000549918), (0.000549918, 0.019992438))
            ThreePointArc((0.000549918, 0.019992438), (0.514497665, 0.00585565), (1.029223113, 0.019992438))
            Line((1.029223113, 0.019992438), (1.028673195, 0))
        make_face()
    extrude(amount=25.643365976, mode=Mode.SUBTRACT)
    with BuildSketch(Plane(origin=(0, -4.571682988, 4), x_dir=(0.9996219169112968, 0, 0.027495876610586494), z_dir=(0, 1, 0))) as chamfer_4_piece_24:
        with BuildLine():
            Line((1.028673195, 0), (-0.056547155, 1.027117794))
            Line((-0.056547155, 1.027117794), (-0.076539593, 1.026567876))
            ThreePointArc((-0.076539593, 1.026567876), (-0.034129227, 0.51339783), (-0.019992438, -0.000549918))
            Line((-0.019992438, -0.000549918), (0.000549918, -0.019992438))
            ThreePointArc((0.000549918, -0.019992438), (0.514497665, -0.00585565), (1.029223113, -0.019992438))
            Line((1.029223113, -0.019992438), (1.028673195, 0))
        make_face()
    extrude(amount=21.393365976, mode=Mode.SUBTRACT)
    with BuildSketch(Plane(origin=(-1.81845448, -0.18154552, -16.5), x_dir=(0.7068394360706737, 0.7068394360706735, -0.027495876610585647), z_dir=(0.7071067811865475, -0.7071067811865476, 0))) as chamfer_4_piece_25a_section:
        with BuildLine():
            Line((1.028673195, 0), (-0.056547155, 1.027117794))
            Line((-0.056547155, 1.027117794), (-0.076539593, 1.026567876))
            ThreePointArc((-0.076539593, 1.026567876), (-0.034129227, 0.51339783), (-0.019992438, -0.000549918))
            Line((-0.019992438, -0.000549918), (0.000549918, -0.019992438))
            ThreePointArc((0.000549918, -0.019992438), (0.514497665, -0.00585565), (1.029223113, -0.019992438))
            Line((1.029223113, -0.019992438), (1.028673195, 0))
        make_face()
    chamfer_4_piece_25a = extrude(amount=7.971793101, mode=Mode.PRIVATE)
    chamfer_4_piece_25a = split(chamfer_4_piece_25a, bisect_by=Plane(origin=(2, -4.536214365, -16.181906875), z_dir=(1, 0, 0)), keep=Keep.TOP, mode=Mode.PRIVATE)
    with BuildSketch(Plane(origin=(2, -1.428317012, -16.5), x_dir=(0.9996219169112968, 0, -0.027495876610585623), z_dir=(0, -1, 0))) as chamfer_4_piece_25b_section:
        with BuildLine():
            Line((1.028673195, 0), (-0.056547155, 1.027117794))
            Line((-0.056547155, 1.027117794), (-0.076539593, 1.026567876))
            ThreePointArc((-0.076539593, 1.026567876), (-0.034129227, 0.51339783), (-0.019992438, -0.000549918))
            Line((-0.019992438, -0.000549918), (0.000549918, -0.019992438))
            ThreePointArc((0.000549918, -0.019992438), (0.514497665, -0.00585565), (1.029223113, -0.019992438))
            Line((1.029223113, -0.019992438), (1.028673195, 0))
        make_face()
    chamfer_4_piece_25b = extrude(amount=9.893365976, mode=Mode.PRIVATE)
    chamfer_4_piece_25b = split(chamfer_4_piece_25b, bisect_by=Plane(origin=(1.620839187, -3.620839187, -16.181906875), z_dir=(0.7071067811865476, 0.7071067811865475, 0)), keep=Keep.TOP, mode=Mode.PRIVATE)
    chamfer_4_piece_25 = chamfer_4_piece_25a & chamfer_4_piece_25b
    add(chamfer_4_piece_25, mode=Mode.SUBTRACT)
    with BuildSketch(Plane(origin=(2, -1.428317012, 4), x_dir=(0.9996219169112968, 0, 0.027495876610586487), z_dir=(0, -1, 0))) as chamfer_4_piece_26a_section:
        with BuildLine():
            Line((1.028673195, 0), (-0.056547155, -1.027117794))
            Line((-0.056547155, -1.027117794), (-0.076539593, -1.026567876))
            ThreePointArc((-0.076539593, -1.026567876), (-0.034129227, -0.51339783), (-0.019992438, 0.000549918))
            Line((-0.019992438, 0.000549918), (0.000549918, 0.019992438))
            ThreePointArc((0.000549918, 0.019992438), (0.514497665, 0.00585565), (1.029223113, 0.019992438))
            Line((1.029223113, 0.019992438), (1.028673195, 0))
        make_face()
    chamfer_4_piece_26a = extrude(amount=34.143365976, mode=Mode.PRIVATE)
    chamfer_4_piece_26a = split(chamfer_4_piece_26a, bisect_by=Plane(origin=(1.620839187, -3.620839187, 3.681906875), z_dir=(0.7071067811865476, 0.7071067811865475, 0)), keep=Keep.TOP, mode=Mode.PRIVATE)
    with BuildSketch(Plane(origin=(3.81845448, -5.81845448, 4), x_dir=(0.7068394360706737, 0.7068394360706735, 0.027495876610586528), z_dir=(-0.7071067811865475, 0.7071067811865476, 0))) as chamfer_4_piece_26b_section:
        with BuildLine():
            Line((1.028673195, 0), (-0.056547155, 1.027117794))
            Line((-0.056547155, 1.027117794), (-0.076539593, 1.026567876))
            ThreePointArc((-0.076539593, 1.026567876), (-0.034129227, 0.51339783), (-0.019992438, -0.000549918))
            Line((-0.019992438, -0.000549918), (0.000549918, -0.019992438))
            ThreePointArc((0.000549918, -0.019992438), (0.514497665, -0.00585565), (1.029223113, -0.019992438))
            Line((1.029223113, -0.019992438), (1.028673195, 0))
        make_face()
    chamfer_4_piece_26b = extrude(amount=7.971793101, mode=Mode.PRIVATE)
    chamfer_4_piece_26b = split(chamfer_4_piece_26b, bisect_by=Plane(origin=(2, -4.536214365, 3.681906875), z_dir=(1, 0, 0)), keep=Keep.TOP, mode=Mode.PRIVATE)
    chamfer_4_piece_26 = chamfer_4_piece_26a & chamfer_4_piece_26b
    add(chamfer_4_piece_26, mode=Mode.SUBTRACT)
    with BuildSketch(Plane(origin=(46.81845448, -11.81845448, 4), x_dir=(-0.7068394360706728, -0.7068394360706741, 0.027495876610586455), z_dir=(-0.7071067811865482, 0.7071067811865469, 0))) as chamfer_4_piece_27a_section:
        with BuildLine():
            Line((1.028673195, 0), (-0.056547155, -1.027117794))
            Line((-0.056547155, -1.027117794), (-0.076539593, -1.026567876))
            ThreePointArc((-0.076539593, -1.026567876), (-0.034129227, -0.51339783), (-0.019992438, 0.000549918))
            Line((-0.019992438, 0.000549918), (0.000549918, 0.019992438))
            ThreePointArc((0.000549918, 0.019992438), (0.514497665, 0.00585565), (1.029223113, 0.019992438))
            Line((1.029223113, 0.019992438), (1.028673195, 0))
        make_face()
    chamfer_4_piece_27a = extrude(amount=19.2855016, mode=Mode.PRIVATE)
    chamfer_4_piece_27a = split(chamfer_4_piece_27a, bisect_by=Plane(origin=(35, 0.536214365, 3.681906875), z_dir=(-1, 0, 0)), keep=Keep.TOP, mode=Mode.PRIVATE)
    with BuildSketch(Plane(origin=(35, 16.821682988, 4), x_dir=(-0.9996219169112968, 0, 0.027495876610586414), z_dir=(0, -1, 0))) as chamfer_4_piece_27b_section:
        with BuildLine():
            Line((1.028673195, 0), (-0.056547155, 1.027117794))
            Line((-0.056547155, 1.027117794), (-0.076539593, 1.026567876))
            ThreePointArc((-0.076539593, 1.026567876), (-0.034129227, 0.51339783), (-0.019992438, -0.000549918))
            Line((-0.019992438, -0.000549918), (0.000549918, -0.019992438))
            ThreePointArc((0.000549918, -0.019992438), (0.514497665, -0.00585565), (1.029223113, -0.019992438))
            Line((1.029223113, -0.019992438), (1.028673195, 0))
        make_face()
    chamfer_4_piece_27b = extrude(amount=19.393365976, mode=Mode.PRIVATE)
    chamfer_4_piece_27b = split(chamfer_4_piece_27b, bisect_by=Plane(origin=(35.379160813, -0.379160813, 3.681906875), z_dir=(-0.7071067811865469, -0.7071067811865482, 0)), keep=Keep.TOP, mode=Mode.PRIVATE)
    chamfer_4_piece_27 = chamfer_4_piece_27a & chamfer_4_piece_27b
    add(chamfer_4_piece_27, mode=Mode.SUBTRACT)


solid = part_1.part
